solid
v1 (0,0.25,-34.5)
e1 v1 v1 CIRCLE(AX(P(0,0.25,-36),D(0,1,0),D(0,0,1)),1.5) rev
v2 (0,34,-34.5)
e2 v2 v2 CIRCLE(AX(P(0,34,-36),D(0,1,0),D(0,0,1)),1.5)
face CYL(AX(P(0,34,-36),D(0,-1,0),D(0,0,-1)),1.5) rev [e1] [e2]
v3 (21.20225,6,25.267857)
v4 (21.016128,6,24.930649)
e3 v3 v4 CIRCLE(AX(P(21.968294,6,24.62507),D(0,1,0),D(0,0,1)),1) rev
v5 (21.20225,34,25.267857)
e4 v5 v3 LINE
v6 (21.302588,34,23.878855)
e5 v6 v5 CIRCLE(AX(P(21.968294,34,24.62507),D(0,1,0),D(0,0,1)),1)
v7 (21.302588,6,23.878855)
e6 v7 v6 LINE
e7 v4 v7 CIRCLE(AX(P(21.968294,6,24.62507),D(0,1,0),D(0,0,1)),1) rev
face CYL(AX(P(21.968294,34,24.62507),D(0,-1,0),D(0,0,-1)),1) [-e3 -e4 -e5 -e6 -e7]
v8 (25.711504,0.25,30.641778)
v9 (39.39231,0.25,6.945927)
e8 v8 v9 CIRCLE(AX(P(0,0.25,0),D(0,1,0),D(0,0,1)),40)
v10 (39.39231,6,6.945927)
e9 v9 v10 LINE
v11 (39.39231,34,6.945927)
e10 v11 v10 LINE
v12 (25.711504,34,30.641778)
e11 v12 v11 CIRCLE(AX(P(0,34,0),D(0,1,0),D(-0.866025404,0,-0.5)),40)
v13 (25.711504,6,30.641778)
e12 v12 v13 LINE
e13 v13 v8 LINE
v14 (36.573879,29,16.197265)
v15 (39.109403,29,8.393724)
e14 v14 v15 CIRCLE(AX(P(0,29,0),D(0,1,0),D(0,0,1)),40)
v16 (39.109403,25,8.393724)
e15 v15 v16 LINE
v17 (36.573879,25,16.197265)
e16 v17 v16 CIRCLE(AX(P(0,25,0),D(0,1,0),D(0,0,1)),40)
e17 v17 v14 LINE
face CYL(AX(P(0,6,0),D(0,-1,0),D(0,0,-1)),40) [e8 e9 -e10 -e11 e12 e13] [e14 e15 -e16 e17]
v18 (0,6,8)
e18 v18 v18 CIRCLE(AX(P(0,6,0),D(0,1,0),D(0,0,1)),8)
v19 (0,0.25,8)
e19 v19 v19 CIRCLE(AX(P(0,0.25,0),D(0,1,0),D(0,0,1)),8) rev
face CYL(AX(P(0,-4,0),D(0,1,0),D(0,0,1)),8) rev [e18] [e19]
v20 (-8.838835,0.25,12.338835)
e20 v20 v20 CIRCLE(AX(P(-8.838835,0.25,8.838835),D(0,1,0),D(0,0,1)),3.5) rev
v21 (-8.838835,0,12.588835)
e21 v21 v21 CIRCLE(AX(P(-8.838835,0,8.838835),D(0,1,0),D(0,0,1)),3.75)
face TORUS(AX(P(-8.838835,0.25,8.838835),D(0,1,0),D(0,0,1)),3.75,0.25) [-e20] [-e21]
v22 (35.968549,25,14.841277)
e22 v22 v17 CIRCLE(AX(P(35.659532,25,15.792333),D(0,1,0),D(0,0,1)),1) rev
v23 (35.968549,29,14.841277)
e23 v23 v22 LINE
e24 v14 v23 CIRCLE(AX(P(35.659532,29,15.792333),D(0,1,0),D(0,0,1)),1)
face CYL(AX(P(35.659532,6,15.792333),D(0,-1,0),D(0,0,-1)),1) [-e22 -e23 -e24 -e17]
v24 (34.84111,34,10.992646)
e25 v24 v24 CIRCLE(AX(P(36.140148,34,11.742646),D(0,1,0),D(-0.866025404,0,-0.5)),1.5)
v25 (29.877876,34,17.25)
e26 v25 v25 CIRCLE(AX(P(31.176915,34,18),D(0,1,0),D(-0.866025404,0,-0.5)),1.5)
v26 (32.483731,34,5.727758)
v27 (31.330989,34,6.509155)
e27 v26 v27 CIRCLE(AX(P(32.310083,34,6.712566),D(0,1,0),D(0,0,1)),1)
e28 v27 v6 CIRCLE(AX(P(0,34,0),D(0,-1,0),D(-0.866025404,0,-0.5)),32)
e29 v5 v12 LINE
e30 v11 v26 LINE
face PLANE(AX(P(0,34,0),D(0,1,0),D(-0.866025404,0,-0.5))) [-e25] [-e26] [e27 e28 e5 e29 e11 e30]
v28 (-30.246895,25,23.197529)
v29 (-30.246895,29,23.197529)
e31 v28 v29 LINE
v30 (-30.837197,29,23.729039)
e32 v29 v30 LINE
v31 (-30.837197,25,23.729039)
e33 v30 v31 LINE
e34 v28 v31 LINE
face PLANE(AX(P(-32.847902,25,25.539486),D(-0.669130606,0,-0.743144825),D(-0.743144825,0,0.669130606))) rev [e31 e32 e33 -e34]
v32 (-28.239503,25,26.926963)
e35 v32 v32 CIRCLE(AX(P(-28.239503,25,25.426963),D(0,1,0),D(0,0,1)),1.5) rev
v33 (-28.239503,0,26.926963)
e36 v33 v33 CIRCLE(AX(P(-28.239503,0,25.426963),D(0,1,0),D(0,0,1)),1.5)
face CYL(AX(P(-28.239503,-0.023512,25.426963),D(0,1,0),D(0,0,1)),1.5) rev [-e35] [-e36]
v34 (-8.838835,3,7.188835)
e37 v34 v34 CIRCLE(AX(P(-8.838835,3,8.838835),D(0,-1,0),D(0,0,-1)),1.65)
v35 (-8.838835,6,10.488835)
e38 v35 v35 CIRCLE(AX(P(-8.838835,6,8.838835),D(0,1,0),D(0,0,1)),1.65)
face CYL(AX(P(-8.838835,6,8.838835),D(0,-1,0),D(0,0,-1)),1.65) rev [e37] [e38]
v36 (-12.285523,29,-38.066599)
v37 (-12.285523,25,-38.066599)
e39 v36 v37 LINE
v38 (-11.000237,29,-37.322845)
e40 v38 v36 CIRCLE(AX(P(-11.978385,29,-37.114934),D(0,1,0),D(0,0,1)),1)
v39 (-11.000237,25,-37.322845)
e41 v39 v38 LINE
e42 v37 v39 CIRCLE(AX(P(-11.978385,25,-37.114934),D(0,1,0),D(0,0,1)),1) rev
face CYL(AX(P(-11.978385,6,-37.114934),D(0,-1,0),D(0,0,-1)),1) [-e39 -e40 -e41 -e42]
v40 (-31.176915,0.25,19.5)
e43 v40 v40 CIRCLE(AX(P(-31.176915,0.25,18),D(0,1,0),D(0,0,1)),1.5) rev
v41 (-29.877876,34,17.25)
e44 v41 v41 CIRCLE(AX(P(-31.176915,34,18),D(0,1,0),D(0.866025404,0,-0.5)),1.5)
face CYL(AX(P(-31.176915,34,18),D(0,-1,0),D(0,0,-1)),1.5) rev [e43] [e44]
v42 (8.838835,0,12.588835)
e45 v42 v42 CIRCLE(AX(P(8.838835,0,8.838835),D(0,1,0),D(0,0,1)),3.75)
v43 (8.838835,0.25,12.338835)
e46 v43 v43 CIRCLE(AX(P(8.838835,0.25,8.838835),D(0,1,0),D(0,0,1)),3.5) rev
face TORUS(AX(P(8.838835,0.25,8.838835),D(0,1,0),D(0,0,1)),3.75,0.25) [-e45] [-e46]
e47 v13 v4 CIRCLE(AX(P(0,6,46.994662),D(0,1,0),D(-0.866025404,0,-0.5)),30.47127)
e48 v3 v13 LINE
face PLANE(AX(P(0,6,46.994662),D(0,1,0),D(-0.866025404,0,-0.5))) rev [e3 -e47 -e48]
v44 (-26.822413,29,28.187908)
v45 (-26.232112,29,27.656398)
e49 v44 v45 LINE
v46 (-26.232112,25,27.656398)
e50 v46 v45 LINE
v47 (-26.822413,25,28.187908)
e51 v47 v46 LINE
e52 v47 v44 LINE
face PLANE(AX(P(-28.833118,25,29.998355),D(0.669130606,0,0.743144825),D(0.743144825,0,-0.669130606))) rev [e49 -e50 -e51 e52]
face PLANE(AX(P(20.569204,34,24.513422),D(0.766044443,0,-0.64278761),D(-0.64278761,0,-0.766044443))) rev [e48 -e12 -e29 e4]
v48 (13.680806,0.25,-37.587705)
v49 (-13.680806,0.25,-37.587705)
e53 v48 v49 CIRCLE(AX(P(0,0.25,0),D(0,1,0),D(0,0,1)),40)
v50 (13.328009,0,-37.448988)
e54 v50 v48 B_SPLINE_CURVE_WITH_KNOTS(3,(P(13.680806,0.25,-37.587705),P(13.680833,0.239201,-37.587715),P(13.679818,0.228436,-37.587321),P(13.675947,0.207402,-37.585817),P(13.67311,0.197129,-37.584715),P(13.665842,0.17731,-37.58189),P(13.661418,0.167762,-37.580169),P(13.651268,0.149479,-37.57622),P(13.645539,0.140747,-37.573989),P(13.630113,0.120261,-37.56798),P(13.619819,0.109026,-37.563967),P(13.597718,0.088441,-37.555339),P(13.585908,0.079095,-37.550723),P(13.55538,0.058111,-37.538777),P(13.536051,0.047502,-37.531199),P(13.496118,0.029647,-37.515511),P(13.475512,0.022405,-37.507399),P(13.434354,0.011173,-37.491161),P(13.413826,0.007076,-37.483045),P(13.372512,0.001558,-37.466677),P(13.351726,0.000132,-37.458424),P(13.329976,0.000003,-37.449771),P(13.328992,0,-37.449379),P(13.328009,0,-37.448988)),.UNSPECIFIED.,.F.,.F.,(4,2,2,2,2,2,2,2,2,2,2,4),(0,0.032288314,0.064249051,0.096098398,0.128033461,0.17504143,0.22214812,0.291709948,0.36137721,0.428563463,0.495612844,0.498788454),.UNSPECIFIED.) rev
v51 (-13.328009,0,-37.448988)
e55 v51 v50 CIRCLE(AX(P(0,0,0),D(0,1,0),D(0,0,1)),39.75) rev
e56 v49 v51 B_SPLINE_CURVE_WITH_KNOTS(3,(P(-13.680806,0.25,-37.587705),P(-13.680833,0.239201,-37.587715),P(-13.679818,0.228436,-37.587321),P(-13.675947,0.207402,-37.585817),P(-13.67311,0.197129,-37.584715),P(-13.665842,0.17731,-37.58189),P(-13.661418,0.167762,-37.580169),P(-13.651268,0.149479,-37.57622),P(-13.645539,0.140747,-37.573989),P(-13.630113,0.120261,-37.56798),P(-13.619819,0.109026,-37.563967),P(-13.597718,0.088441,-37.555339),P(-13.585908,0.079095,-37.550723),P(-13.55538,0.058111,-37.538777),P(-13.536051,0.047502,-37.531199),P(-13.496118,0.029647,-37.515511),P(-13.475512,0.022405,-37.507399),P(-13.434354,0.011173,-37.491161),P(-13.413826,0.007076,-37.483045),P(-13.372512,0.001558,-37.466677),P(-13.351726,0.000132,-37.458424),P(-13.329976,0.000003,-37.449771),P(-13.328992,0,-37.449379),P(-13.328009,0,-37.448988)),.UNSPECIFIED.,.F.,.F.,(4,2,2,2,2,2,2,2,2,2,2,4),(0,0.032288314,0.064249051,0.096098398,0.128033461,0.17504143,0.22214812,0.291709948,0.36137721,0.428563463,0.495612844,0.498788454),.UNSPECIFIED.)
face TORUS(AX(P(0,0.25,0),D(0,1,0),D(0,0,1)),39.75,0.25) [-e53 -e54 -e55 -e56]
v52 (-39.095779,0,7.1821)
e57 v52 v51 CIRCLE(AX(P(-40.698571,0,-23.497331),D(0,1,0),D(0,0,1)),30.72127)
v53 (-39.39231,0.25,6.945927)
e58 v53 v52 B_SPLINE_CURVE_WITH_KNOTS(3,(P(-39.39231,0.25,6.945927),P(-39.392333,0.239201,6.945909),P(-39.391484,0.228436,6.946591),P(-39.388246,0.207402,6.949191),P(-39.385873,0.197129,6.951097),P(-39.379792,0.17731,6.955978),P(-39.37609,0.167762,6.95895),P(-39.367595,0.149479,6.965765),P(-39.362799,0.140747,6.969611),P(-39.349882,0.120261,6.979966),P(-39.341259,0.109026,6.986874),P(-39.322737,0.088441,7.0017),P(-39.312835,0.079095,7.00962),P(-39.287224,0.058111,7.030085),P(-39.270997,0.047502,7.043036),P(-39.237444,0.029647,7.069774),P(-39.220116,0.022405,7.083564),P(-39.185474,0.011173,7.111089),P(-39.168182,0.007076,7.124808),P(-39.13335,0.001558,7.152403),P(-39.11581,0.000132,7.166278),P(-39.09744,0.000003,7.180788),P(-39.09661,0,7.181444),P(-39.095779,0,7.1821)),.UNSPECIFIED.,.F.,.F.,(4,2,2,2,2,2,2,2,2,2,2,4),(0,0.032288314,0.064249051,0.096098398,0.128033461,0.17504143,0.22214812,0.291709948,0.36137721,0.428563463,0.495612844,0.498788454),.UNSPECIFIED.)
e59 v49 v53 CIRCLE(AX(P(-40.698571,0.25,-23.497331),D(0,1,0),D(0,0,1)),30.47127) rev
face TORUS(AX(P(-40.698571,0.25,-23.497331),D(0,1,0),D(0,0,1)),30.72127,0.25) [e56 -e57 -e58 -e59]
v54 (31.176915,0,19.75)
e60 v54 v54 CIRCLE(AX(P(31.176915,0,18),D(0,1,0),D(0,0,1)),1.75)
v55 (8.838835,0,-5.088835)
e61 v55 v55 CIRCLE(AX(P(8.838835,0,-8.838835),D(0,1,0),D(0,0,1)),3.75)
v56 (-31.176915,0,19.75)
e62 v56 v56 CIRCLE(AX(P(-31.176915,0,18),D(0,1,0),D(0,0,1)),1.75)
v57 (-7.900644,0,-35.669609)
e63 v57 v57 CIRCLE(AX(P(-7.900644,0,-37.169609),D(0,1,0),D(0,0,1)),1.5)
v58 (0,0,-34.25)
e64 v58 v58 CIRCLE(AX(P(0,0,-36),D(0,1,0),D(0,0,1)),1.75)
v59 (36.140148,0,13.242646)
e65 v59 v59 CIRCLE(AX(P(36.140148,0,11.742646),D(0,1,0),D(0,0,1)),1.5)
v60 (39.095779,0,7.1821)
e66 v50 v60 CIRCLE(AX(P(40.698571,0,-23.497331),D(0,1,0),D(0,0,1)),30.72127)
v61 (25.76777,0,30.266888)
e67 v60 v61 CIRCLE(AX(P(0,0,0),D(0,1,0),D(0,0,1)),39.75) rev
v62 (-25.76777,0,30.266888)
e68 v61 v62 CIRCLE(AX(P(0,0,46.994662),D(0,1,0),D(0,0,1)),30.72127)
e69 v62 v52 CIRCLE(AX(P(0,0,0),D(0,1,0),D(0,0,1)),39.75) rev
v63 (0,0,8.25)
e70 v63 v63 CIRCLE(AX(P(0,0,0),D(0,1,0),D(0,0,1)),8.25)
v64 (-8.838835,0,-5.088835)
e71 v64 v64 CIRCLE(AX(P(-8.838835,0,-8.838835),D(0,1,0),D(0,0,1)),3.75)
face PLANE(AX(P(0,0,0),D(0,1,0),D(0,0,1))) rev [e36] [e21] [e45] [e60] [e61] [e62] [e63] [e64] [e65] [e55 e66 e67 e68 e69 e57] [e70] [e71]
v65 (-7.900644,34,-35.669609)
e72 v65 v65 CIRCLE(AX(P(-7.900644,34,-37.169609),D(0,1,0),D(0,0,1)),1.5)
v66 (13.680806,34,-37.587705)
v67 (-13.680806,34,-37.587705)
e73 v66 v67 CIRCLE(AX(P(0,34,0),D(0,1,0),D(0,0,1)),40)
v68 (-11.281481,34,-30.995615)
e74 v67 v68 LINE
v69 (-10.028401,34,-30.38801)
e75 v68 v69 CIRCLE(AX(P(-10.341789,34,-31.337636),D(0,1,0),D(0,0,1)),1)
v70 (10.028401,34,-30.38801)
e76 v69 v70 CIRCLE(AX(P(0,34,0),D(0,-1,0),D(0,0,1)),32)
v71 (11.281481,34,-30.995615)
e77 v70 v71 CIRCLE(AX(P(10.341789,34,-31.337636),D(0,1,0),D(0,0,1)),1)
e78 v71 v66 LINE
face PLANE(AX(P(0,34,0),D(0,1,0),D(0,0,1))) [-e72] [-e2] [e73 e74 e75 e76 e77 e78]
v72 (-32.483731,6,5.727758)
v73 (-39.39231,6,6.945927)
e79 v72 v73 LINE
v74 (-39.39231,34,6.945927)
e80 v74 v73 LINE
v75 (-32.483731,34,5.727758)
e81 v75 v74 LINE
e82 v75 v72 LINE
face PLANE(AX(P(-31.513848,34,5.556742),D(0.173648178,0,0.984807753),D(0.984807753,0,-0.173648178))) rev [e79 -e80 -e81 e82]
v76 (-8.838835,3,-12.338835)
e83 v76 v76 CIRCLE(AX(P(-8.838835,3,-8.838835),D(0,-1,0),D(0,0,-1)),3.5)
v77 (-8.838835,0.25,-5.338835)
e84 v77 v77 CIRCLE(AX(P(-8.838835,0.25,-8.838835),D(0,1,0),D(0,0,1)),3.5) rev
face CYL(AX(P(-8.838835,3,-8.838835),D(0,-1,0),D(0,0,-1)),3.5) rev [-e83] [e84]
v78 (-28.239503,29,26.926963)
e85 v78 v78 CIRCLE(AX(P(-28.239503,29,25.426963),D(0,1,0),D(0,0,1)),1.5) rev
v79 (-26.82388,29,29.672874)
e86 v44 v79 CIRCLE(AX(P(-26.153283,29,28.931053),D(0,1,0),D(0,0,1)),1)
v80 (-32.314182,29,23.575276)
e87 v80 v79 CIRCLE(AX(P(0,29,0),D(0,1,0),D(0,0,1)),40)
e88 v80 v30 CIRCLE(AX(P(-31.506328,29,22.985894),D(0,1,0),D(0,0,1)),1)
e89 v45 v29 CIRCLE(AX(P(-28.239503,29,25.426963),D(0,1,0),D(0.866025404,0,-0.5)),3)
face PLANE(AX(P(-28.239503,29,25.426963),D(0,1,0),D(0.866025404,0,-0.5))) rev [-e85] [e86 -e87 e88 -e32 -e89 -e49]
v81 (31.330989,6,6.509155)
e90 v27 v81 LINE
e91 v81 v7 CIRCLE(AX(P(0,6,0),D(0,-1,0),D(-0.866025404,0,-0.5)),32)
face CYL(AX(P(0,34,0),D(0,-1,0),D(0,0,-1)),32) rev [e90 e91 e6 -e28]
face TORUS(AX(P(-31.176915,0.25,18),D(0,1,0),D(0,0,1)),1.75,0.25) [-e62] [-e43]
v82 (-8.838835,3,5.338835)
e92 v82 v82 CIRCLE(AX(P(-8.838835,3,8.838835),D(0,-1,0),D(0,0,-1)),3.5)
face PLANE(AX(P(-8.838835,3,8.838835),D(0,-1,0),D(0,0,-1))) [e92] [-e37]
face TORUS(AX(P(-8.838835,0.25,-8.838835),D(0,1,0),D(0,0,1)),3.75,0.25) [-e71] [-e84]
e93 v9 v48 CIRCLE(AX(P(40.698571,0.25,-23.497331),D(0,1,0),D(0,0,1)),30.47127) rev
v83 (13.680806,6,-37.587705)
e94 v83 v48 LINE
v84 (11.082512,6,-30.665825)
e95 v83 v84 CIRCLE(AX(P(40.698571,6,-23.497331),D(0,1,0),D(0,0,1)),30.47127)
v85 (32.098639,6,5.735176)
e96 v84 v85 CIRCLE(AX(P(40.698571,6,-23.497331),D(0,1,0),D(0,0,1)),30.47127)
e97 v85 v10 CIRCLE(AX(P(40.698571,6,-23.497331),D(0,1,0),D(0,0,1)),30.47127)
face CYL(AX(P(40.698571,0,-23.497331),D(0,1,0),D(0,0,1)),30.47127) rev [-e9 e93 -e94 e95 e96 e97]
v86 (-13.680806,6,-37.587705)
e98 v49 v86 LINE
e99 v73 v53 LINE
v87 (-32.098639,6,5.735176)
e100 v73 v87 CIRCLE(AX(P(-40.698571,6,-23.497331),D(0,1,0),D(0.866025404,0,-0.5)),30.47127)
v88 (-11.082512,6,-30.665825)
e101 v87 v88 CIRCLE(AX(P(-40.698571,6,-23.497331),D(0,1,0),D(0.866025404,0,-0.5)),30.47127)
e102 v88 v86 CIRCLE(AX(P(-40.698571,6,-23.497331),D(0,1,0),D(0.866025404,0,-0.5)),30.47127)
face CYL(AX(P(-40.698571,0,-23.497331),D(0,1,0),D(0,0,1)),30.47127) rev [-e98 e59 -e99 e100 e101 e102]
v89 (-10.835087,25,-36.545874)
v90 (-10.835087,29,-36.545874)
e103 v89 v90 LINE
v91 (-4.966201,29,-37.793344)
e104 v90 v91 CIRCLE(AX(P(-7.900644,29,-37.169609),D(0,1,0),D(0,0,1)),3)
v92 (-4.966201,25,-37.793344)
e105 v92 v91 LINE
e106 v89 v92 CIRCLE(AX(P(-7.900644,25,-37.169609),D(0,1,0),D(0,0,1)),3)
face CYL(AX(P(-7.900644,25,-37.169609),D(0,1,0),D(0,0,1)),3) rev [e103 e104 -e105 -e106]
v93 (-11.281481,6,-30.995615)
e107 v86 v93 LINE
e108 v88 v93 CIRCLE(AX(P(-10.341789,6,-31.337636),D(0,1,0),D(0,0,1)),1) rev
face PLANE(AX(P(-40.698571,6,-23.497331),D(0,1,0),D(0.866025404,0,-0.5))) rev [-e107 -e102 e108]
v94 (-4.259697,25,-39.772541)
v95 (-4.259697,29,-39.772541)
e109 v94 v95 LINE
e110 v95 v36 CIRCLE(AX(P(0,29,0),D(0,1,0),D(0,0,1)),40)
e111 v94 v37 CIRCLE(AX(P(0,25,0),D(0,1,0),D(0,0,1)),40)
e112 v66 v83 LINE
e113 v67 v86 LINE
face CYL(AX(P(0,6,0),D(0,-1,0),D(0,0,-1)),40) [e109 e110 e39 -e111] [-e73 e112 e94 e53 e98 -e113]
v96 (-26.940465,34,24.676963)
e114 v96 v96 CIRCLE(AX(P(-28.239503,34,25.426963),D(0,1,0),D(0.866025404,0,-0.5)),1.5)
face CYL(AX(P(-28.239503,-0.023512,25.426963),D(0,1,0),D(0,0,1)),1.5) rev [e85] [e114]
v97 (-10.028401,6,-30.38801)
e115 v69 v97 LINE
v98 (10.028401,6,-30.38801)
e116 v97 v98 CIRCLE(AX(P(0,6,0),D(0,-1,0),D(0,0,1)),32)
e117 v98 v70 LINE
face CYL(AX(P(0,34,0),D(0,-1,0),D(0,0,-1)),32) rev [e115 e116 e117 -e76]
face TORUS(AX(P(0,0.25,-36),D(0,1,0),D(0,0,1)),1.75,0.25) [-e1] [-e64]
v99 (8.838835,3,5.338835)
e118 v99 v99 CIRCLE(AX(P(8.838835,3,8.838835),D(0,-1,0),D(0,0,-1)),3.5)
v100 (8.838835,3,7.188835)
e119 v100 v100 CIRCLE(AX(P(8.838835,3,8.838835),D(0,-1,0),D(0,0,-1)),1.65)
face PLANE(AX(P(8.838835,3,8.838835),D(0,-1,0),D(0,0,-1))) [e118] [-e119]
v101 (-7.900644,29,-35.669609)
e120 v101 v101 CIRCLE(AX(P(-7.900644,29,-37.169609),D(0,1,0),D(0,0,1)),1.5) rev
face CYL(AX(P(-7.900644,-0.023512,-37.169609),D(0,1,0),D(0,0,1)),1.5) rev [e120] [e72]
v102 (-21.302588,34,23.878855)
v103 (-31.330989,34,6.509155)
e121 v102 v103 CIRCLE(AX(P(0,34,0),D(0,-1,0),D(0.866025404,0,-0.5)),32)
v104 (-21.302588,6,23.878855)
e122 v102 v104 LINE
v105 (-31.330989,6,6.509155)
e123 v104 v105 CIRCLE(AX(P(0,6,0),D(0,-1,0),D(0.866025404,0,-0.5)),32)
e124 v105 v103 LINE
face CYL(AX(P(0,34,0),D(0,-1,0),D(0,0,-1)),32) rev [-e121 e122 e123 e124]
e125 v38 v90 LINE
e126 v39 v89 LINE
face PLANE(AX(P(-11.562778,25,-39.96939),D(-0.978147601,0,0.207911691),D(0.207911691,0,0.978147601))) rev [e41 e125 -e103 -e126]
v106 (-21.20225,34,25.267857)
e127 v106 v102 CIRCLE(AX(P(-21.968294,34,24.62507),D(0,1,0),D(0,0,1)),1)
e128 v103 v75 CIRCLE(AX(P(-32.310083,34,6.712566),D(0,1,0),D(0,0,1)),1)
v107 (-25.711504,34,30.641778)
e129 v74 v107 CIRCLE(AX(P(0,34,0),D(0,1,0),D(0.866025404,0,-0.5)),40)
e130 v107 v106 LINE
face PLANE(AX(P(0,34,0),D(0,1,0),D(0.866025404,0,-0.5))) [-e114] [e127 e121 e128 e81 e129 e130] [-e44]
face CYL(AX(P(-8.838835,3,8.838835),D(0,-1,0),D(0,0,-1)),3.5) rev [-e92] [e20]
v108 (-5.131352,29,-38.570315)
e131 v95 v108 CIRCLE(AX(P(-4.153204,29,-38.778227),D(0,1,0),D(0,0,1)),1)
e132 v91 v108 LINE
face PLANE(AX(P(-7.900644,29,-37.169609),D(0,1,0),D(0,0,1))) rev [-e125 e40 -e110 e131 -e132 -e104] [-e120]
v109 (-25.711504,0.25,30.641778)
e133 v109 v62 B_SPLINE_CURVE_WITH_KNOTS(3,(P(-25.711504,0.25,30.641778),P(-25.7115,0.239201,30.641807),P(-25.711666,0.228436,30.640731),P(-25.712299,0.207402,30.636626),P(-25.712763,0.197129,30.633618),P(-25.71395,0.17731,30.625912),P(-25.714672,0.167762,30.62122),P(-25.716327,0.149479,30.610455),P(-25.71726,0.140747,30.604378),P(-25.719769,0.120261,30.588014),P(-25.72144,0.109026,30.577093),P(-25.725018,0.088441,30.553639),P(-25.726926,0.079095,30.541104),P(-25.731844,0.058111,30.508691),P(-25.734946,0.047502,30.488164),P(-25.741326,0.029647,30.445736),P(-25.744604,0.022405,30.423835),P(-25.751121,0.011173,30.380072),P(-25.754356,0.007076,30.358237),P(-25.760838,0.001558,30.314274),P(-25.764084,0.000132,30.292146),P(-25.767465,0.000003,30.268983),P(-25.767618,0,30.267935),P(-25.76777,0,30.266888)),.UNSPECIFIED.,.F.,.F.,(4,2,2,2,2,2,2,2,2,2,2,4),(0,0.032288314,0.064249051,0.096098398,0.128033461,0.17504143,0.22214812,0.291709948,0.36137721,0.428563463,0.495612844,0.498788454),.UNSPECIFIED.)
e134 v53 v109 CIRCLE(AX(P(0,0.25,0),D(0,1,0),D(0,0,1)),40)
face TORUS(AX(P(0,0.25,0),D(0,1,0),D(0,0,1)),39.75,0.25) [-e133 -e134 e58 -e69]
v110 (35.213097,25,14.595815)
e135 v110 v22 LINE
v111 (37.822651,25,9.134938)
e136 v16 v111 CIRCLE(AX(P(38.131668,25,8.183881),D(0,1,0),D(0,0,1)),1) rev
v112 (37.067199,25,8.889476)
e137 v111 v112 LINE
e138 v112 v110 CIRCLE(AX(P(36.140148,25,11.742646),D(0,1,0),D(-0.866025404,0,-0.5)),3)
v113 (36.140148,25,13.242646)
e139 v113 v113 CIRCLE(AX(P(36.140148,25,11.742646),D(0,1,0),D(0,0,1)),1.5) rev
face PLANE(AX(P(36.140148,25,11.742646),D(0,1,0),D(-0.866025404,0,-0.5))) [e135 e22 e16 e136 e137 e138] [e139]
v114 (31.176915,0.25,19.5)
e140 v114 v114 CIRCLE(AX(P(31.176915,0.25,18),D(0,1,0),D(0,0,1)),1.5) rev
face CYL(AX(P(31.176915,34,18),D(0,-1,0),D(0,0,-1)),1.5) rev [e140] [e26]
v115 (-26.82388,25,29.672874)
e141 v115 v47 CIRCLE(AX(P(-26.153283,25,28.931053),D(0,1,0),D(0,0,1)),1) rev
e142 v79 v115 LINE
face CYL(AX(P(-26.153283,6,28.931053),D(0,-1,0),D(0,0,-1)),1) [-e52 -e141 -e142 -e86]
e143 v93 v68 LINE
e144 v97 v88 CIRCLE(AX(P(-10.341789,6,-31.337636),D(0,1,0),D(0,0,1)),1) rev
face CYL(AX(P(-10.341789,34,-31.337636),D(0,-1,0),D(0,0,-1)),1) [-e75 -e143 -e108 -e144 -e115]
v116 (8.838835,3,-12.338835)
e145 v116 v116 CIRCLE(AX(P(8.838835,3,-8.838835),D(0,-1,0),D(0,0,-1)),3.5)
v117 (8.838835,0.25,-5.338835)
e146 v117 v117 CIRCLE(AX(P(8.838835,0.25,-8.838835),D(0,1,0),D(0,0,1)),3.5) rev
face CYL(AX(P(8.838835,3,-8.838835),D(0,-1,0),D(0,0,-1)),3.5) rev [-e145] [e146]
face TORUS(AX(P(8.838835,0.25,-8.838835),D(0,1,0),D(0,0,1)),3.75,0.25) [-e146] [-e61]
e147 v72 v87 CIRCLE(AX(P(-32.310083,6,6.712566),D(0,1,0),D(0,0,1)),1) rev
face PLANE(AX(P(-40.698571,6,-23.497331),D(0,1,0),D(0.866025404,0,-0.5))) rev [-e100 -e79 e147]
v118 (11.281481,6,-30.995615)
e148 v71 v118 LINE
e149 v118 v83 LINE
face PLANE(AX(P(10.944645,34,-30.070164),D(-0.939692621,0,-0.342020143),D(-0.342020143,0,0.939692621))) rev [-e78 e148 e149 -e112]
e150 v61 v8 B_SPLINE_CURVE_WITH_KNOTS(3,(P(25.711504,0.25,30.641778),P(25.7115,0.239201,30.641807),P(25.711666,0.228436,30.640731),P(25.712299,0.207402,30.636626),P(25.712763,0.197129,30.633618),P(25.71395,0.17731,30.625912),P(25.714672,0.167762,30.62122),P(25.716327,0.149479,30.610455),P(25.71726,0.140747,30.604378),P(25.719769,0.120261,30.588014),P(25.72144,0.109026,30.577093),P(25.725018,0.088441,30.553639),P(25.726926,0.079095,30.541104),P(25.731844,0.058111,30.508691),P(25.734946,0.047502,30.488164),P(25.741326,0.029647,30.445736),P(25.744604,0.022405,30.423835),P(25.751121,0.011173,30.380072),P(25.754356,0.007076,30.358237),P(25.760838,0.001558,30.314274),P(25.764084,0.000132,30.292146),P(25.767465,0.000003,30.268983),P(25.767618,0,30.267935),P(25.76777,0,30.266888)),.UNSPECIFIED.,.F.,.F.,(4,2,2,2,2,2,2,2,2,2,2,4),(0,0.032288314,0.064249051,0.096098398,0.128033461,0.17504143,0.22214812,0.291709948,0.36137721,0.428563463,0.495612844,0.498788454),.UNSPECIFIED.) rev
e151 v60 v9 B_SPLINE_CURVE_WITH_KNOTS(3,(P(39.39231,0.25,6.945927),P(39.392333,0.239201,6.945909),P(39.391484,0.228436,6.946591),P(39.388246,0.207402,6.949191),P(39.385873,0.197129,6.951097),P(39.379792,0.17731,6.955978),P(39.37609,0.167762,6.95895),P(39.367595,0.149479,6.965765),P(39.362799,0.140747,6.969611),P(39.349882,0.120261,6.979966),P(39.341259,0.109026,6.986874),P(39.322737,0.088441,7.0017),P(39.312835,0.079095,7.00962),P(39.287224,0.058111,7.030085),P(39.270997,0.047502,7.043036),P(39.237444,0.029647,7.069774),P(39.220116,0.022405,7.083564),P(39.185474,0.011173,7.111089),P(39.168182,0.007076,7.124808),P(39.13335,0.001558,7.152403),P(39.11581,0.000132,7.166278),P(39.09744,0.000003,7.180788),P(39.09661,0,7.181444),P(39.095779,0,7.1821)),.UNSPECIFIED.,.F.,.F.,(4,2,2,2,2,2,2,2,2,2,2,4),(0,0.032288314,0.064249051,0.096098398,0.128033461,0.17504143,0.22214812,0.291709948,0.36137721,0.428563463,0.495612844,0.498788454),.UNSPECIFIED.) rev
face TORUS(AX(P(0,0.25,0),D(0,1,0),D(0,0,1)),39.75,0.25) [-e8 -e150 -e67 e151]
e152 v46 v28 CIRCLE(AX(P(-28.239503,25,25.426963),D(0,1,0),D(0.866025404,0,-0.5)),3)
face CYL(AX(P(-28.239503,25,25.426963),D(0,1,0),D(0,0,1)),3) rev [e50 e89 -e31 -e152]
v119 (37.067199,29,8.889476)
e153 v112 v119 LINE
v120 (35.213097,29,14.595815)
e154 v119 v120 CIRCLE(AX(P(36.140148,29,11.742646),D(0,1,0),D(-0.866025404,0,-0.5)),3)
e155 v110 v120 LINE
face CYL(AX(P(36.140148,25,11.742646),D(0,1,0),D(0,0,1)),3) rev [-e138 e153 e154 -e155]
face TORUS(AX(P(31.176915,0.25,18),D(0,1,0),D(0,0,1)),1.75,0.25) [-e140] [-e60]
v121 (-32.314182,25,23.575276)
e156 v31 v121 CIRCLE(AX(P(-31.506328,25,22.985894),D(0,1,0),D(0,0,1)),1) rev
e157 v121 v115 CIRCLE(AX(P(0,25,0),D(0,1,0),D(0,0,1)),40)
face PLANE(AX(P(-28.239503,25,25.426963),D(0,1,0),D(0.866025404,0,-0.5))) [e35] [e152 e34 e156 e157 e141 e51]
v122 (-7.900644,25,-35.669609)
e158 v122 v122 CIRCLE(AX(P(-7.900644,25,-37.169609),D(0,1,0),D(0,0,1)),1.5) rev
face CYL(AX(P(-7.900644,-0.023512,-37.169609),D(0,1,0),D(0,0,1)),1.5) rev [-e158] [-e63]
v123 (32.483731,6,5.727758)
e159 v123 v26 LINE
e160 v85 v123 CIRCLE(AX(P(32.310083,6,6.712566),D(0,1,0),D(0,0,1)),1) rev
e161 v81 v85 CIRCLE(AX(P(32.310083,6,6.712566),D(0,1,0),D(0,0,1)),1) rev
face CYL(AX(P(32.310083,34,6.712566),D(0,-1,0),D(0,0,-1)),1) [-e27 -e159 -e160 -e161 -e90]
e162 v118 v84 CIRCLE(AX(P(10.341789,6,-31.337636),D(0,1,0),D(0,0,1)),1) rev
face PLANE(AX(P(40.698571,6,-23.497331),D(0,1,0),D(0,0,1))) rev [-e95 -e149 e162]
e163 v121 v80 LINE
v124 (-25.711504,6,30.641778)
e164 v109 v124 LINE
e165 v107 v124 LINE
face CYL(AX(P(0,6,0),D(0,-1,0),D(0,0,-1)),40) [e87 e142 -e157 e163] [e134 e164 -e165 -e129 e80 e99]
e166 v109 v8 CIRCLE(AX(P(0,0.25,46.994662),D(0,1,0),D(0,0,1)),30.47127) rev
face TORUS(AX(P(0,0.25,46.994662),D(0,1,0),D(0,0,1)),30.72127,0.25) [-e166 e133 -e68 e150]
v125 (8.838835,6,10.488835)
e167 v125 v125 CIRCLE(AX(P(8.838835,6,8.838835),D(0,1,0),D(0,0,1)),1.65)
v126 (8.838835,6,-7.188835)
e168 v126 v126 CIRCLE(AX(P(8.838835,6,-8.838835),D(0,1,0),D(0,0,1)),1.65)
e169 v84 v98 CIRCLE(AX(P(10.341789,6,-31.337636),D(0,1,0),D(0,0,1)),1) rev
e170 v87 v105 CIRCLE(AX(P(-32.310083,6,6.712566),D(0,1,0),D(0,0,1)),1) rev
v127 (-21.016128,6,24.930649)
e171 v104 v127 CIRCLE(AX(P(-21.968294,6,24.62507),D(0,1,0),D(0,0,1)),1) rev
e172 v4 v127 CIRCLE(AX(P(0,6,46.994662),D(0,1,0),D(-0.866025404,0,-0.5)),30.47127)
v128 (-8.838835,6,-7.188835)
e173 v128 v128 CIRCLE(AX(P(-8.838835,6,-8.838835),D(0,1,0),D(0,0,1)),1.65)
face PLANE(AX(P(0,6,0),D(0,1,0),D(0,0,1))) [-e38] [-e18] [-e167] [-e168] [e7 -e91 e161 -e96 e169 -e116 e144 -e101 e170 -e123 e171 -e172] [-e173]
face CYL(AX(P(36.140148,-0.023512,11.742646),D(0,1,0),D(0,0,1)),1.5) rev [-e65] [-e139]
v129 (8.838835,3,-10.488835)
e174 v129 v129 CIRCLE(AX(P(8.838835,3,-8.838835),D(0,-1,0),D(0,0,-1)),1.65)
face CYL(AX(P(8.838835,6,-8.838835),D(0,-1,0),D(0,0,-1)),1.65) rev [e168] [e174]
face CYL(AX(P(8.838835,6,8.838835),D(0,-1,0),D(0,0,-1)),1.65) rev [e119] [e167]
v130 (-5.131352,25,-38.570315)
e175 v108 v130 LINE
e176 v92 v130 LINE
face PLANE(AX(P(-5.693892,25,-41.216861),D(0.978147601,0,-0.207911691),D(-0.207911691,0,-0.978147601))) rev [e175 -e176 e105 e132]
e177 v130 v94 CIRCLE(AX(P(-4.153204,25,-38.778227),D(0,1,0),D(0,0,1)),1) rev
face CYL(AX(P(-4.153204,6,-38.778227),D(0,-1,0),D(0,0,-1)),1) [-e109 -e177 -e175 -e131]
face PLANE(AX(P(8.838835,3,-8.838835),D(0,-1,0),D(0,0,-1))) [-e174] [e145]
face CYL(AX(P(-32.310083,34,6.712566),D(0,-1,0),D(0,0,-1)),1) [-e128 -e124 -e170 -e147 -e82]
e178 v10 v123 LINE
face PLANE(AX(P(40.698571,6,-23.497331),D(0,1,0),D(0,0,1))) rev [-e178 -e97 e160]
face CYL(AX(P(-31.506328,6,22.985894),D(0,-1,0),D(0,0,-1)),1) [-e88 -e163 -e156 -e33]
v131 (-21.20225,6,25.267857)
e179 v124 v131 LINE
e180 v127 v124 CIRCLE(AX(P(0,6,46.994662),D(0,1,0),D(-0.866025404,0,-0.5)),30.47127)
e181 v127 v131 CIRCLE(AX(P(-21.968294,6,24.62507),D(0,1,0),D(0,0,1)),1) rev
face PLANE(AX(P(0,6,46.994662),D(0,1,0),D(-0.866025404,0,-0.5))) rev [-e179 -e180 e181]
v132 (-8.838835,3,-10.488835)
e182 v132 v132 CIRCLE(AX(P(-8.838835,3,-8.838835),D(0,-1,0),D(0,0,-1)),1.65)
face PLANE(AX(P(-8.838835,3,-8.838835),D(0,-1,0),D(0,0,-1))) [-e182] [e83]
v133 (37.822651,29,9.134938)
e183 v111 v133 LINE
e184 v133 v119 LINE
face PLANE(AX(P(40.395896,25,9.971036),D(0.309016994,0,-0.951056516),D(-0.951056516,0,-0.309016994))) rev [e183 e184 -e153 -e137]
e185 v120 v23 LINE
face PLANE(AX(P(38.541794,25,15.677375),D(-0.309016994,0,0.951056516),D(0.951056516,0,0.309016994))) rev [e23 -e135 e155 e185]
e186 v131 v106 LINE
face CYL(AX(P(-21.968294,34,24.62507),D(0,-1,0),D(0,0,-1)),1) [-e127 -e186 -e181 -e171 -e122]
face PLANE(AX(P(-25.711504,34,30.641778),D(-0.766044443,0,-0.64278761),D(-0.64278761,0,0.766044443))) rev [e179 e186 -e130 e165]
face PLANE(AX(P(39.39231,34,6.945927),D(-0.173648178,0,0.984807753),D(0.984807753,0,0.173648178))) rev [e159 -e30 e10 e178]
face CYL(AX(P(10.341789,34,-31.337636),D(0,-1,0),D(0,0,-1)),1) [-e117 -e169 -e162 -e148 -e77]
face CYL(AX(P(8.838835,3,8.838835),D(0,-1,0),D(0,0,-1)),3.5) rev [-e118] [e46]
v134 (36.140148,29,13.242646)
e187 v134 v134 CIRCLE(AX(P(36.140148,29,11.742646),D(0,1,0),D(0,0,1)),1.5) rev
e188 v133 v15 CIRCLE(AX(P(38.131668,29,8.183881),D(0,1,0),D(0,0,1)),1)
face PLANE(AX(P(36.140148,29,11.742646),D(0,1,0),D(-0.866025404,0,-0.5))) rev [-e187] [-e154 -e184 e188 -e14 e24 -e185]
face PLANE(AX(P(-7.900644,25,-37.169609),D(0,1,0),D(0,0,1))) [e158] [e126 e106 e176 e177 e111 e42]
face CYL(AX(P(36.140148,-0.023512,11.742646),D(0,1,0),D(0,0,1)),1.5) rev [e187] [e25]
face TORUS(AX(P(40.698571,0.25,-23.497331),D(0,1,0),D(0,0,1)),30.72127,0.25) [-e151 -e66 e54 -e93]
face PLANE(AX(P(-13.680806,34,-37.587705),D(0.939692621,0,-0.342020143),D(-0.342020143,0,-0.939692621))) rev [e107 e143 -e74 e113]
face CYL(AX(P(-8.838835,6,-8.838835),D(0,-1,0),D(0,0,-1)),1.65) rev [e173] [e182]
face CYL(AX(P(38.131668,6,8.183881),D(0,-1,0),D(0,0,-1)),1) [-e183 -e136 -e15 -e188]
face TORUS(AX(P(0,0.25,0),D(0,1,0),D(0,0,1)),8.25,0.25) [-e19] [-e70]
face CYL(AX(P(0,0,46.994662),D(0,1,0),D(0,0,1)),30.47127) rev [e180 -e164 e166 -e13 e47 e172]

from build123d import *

# Parameters (mm, degrees)
SKETCH1_R                = 40
SKETCH1_R_2              = 1.65
BOSS_EXTRUDE1_DEPTH      = 6
SKETCH2_R                = 1.5
BOSS_EXTRUDE2_DEPTH      = 28
SKETCH16_R               = 1.5
CUT_EXTRUDE9_DEPTH       = 67
CIRPATTERN1_COUNT        = 3
SKETCH3_R                = 8
CUT_EXTRUDE1_DEPTH       = 10
SKETCH4_R                = 3.5
CUT_EXTRUDE2_DEPTH       = 3
SKETCH5_R                = 30.471270003
CUT_EXTRUDE3_DEPTH       = 64.118935352
CIRPATTERN2_COUNT        = 3
FILLET1_R                = 0.25
FILLET2_R                = 1
SKETCH9_R                = 1.5
CUT_EXTRUDE4_DEPTH       = 64.188243513
CUT_EXTRUDE5_DEPTH       = 4
FILLET3_R                = 1
CIRPATTERN3_COUNT        = 3
FILLET3_OF_CIRPATTERN3_R = 1


with BuildPart() as part:
    # Sketch1 → Boss-Extrude1 (new body)
    with BuildSketch(Plane(origin=(0, 0, 0), x_dir=(1, 0, 0), z_dir=(0, 1, 0))):
        with Locations(Location((0, 0, 0), (0, 0, 270))):
            Circle(SKETCH1_R)
        with Locations(Location((-8.838834765, 8.838834765, 0), (0, 0, 270))):
            Circle(SKETCH1_R_2, mode=Mode.SUBTRACT)
        with Locations(Location((8.838834765, 8.838834765, 0), (0, 0, 270))):
            Circle(SKETCH1_R_2, mode=Mode.SUBTRACT)
        with Locations(Location((8.838834765, -8.838834765, 0), (0, 0, 270))):
            Circle(SKETCH1_R_2, mode=Mode.SUBTRACT)
        with Locations(Location((-8.838834765, -8.838834765, 0), (0, 0, 270))):
            Circle(SKETCH1_R_2, mode=Mode.SUBTRACT)
    extrude(amount=BOSS_EXTRUDE1_DEPTH)

    # Sketch2 → Boss-Extrude2 (add)
    with BuildSketch(Plane(origin=(0, 6, 0), x_dir=(1, 0, 0), z_dir=(0, 1, 0))):
        with BuildLine():
            Line((-13.680805733, 37.587704831), (-10.944644586, 30.070163865))
            ThreePointArc((-10.944644586, 30.070163865), (0, 32), (10.944644586, 30.070163865))
            Line((10.944644586, 30.070163865), (13.680805733, 37.587704831))
            ThreePointArc((13.680805733, 37.587704831), (0, 40), (-13.680805733, 37.587704831))
        make_face()
        with Locations(Location((0, 36, 0), (0, 0, 270))):
            Circle(SKETCH2_R, mode=Mode.SUBTRACT)
    boss_extrude2 = extrude(amount=BOSS_EXTRUDE2_DEPTH)

    # Sketch16 → Cut-Extrude9 (cut, through all)
    with BuildSketch(Plane(origin=(0, 34, 0), x_dir=(1, 0, 0), z_dir=(0, 1, 0))):
        with Locations(Location((0, 36, 0), (0, 0, 270))):
            Circle(SKETCH16_R)
    cut_extrude9 = extrude(amount=-CUT_EXTRUDE9_DEPTH, mode=Mode.SUBTRACT)

    # CirPattern1: Boss-Extrude2, Cut-Extrude9 ×3 about axis
    cirpattern1_axis = Axis((0, 0, 0), (0, 1, 0))
    add([boss_extrude2.rotate(cirpattern1_axis, i * 360 / CIRPATTERN1_COUNT) for i in range(1, CIRPATTERN1_COUNT)])
    add([cut_extrude9.rotate(cirpattern1_axis, i * 360 / CIRPATTERN1_COUNT) for i in range(1, CIRPATTERN1_COUNT)], mode=Mode.SUBTRACT)

    # Sketch3 → Cut-Extrude1 (cut)
    with BuildSketch(Plane(origin=(0, 6, 0), x_dir=(1, 0, 0), z_dir=(0, 1, 0))):
        with Locations(Location((0, 0, 0), (0, 0, 270))):
            Circle(SKETCH3_R)
    extrude(amount=-CUT_EXTRUDE1_DEPTH, mode=Mode.SUBTRACT)

    # Sketch4 → Cut-Extrude2 (cut)
    with BuildSketch(Plane.XZ):
        with Locations(Location((8.838834765, 8.838834765, 0), (0, 0, 270))):
            Circle(SKETCH4_R)
        with Locations(Location((8.838834765, -8.838834765, 0), (0, 0, 270))):
            Circle(SKETCH4_R)
        with Locations(Location((-8.838834765, -8.838834765, 0), (0, 0, 270))):
            Circle(SKETCH4_R)
        with Locations(Location((-8.838834765, 8.838834765, 0), (0, 0, 270))):
            Circle(SKETCH4_R)
    extrude(amount=-CUT_EXTRUDE2_DEPTH, mode=Mode.SUBTRACT)

    # Sketch5 → Cut-Extrude3 (cut, through all)
    with BuildSketch(Plane(origin=(0, 6, 0), x_dir=(1, 0, 0), z_dir=(0, 1, 0))):
        with Locations((40.698571494, 23.497331208)):
            Circle(SKETCH5_R)
    cut_extrude3 = extrude(amount=-CUT_EXTRUDE3_DEPTH, mode=Mode.SUBTRACT)

    # CirPattern2: Cut-Extrude3 ×3 about axis
    cirpattern2_axis = Axis((0, 0, 0), (0, 1, 0))
    for i in range(1, CIRPATTERN2_COUNT):
        add(cut_extrude3.rotate(cirpattern2_axis, i * 360 / CIRPATTERN2_COUNT), mode=Mode.SUBTRACT)

    # Fillet1
    fillet1_edges = [part.edges().sort_by_distance(p)[0] for p in [
        (-8.838834765, 0, -5.338834765),
        (8.838834765, 0, -5.338834765),
        (8.838834765, 0, 12.338834765),
        (0, 0, -40),
        (14.309677586, 0, -8.261696207),
        (-34.641016151, 0, 20),
        (34.641016151, 0, 20),
        (-14.309677586, 0, -8.261696207),
        (0, 0, 16.523392413),
        (0, 0, -37.5),
        (-32.475952642, 0, 18.75),
        (32.475952642, 0, 18.75),
        (0, 0, -8),
        (-8.838834765, 0, 12.338834765),
    ]]
    fillet(fillet1_edges, radius=FILLET1_R)

    # Fillet2
    # the kernel refuses this fillet: 1 mm, written as the material it takes off along each edge
    with BuildSketch(Plane(origin=(-10.944644586, 6, -30.070163865), x_dir=(-0.3420201433256649, 0, -0.9396926207859098), z_dir=(0, 1, 0)), Plane(origin=(-20.56920351, 6, 24.51342218), x_dir=(-0.6427876096865415, 0, 0.7660444431189762), z_dir=(0, 1, 0))) as fillet2_piece_1:
        with BuildLine():
            CenterArc((0.984845005, -1), FILLET2_R, 90, 88.263498424)
            ThreePointArc((-0.014695753, -0.96969697), (-0.003674149, -0.48490416), (0, 0))
            Line((0, 0), (0.984845005, 0))
        make_face()
    extrude(amount=30.462112512, mode=Mode.SUBTRACT)
    with BuildSketch(Plane(origin=(10.944644586, 6, -30.070163865), x_dir=(0.34202014332567066, 0, -0.9396926207859077), z_dir=(0, 1, 0)), Plane(origin=(-31.513848096, 6, 5.556741685), x_dir=(-0.9848077530122085, 0, 0.17364817766692828), z_dir=(0, 1, 0))) as fillet2_piece_2:
        with BuildLine():
            CenterArc((0.984845005, 1), FILLET2_R, 181.736501576, 88.263498424)
            ThreePointArc((-0.014695753, 0.96969697), (-0.003674149, 0.48490416), (0, 0))
            Line((0, 0), (0.984845005, 0))
        make_face()
    extrude(amount=30.462112512, mode=Mode.SUBTRACT)
    with BuildSketch(Plane(origin=(31.513848096, 6, 5.556741685), x_dir=(-0.1885512828888332, 0, 0.9820633450653655), z_dir=(0, 1, 0))) as fillet2_piece_3:
        with BuildLine():
            CenterArc((0.984961575, 0.999885183), FILLET2_R, 180.868250788, 88.263498424)
            Line((-0.014923608, 0.984731928), (0, 0))
            ThreePointArc((0, 0), (0.48490416, 0.003674149), (0.96980832, 0))
        make_face()
    extrude(amount=30.462112512, mode=Mode.SUBTRACT)
    with BuildSketch(Plane(origin=(20.56920351, 6, 24.51342218), x_dir=(0.7562161635077187, 0, -0.6543218734305519), z_dir=(0, 1, 0))) as fillet2_piece_4:
        with BuildLine():
            CenterArc((0.984961575, -0.999885183), FILLET2_R, 90.868250788, 88.263498424)
            Line((-0.014923608, -0.984731928), (0, 0))
            ThreePointArc((0, 0), (0.48490416, -0.003674149), (0.96980832, 0))
        make_face()
    extrude(amount=30.462112512, mode=Mode.SUBTRACT)

    # Sketch9 → Cut-Extrude4 (cut, symmetric)
    with BuildSketch(Plane(origin=(0, 29, 0), x_dir=(1, 0, 0), z_dir=(0, 1, 0))):
        with Locations(Location((-7.900644251, 37.169608828, 0), (0, 0, 270))):
            Circle(SKETCH9_R)
    cut_extrude4 = extrude(amount=CUT_EXTRUDE4_DEPTH, both=True, mode=Mode.SUBTRACT)

    # Sketch10 → Cut-Extrude5 (cut)
    with BuildSketch(Plane(origin=(0, 29, 0), x_dir=(1, 0, 0), z_dir=(0, 1, 0))):
        with BuildLine():
            Line((-11.562777971, 39.969390358), (-10.835087053, 36.545873755))
            ThreePointArc((-10.835087053, 36.545873755), (-7.276909179, 34.235166026), (-4.966201449, 37.7933439))
            Line((-4.966201449, 37.7933439), (-5.693892367, 41.216860503))
            Line((-5.693892367, 41.216860503), (-11.562777971, 39.969390358))
        make_face()
    cut_extrude5 = extrude(amount=-CUT_EXTRUDE5_DEPTH, mode=Mode.SUBTRACT)

    # Fillet3
    fillet3_edges = [part.edges().sort_by_distance(p)[0] for p in [
        (-11.227487385, 27, -38.391972169),
        (-5.35860178, 27, -39.639442314),
    ]]
    fillet(fillet3_edges, radius=FILLET3_R)

    # CirPattern3: Cut-Extrude4, Cut-Extrude5 ×3 about axis
    cirpattern3_axis = Axis((0, 0, 0), (0, 1, 0))
    add([cut_extrude4.rotate(cirpattern3_axis, i * 360 / CIRPATTERN3_COUNT) for i in range(1, CIRPATTERN3_COUNT)], mode=Mode.SUBTRACT)
    add([cut_extrude5.rotate(cirpattern3_axis, i * 360 / CIRPATTERN3_COUNT) for i in range(1, CIRPATTERN3_COUNT)], mode=Mode.SUBTRACT)

    # Fillet3 of CirPattern3
    fillet3_of_cirpattern3_edges = [part.edges().sort_by_distance(p)[0] for p in [
        (-27.634679507, 27, 28.91927538),
        (-31.649463146, 27, 24.460406427),
        (38.862166892, 27, 9.472696789),
        (37.008064926, 27, 15.179035887),
    ]]
    fillet(fillet3_of_cirpattern3_edges, radius=FILLET3_OF_CIRPATTERN3_R)


solid = part.part
